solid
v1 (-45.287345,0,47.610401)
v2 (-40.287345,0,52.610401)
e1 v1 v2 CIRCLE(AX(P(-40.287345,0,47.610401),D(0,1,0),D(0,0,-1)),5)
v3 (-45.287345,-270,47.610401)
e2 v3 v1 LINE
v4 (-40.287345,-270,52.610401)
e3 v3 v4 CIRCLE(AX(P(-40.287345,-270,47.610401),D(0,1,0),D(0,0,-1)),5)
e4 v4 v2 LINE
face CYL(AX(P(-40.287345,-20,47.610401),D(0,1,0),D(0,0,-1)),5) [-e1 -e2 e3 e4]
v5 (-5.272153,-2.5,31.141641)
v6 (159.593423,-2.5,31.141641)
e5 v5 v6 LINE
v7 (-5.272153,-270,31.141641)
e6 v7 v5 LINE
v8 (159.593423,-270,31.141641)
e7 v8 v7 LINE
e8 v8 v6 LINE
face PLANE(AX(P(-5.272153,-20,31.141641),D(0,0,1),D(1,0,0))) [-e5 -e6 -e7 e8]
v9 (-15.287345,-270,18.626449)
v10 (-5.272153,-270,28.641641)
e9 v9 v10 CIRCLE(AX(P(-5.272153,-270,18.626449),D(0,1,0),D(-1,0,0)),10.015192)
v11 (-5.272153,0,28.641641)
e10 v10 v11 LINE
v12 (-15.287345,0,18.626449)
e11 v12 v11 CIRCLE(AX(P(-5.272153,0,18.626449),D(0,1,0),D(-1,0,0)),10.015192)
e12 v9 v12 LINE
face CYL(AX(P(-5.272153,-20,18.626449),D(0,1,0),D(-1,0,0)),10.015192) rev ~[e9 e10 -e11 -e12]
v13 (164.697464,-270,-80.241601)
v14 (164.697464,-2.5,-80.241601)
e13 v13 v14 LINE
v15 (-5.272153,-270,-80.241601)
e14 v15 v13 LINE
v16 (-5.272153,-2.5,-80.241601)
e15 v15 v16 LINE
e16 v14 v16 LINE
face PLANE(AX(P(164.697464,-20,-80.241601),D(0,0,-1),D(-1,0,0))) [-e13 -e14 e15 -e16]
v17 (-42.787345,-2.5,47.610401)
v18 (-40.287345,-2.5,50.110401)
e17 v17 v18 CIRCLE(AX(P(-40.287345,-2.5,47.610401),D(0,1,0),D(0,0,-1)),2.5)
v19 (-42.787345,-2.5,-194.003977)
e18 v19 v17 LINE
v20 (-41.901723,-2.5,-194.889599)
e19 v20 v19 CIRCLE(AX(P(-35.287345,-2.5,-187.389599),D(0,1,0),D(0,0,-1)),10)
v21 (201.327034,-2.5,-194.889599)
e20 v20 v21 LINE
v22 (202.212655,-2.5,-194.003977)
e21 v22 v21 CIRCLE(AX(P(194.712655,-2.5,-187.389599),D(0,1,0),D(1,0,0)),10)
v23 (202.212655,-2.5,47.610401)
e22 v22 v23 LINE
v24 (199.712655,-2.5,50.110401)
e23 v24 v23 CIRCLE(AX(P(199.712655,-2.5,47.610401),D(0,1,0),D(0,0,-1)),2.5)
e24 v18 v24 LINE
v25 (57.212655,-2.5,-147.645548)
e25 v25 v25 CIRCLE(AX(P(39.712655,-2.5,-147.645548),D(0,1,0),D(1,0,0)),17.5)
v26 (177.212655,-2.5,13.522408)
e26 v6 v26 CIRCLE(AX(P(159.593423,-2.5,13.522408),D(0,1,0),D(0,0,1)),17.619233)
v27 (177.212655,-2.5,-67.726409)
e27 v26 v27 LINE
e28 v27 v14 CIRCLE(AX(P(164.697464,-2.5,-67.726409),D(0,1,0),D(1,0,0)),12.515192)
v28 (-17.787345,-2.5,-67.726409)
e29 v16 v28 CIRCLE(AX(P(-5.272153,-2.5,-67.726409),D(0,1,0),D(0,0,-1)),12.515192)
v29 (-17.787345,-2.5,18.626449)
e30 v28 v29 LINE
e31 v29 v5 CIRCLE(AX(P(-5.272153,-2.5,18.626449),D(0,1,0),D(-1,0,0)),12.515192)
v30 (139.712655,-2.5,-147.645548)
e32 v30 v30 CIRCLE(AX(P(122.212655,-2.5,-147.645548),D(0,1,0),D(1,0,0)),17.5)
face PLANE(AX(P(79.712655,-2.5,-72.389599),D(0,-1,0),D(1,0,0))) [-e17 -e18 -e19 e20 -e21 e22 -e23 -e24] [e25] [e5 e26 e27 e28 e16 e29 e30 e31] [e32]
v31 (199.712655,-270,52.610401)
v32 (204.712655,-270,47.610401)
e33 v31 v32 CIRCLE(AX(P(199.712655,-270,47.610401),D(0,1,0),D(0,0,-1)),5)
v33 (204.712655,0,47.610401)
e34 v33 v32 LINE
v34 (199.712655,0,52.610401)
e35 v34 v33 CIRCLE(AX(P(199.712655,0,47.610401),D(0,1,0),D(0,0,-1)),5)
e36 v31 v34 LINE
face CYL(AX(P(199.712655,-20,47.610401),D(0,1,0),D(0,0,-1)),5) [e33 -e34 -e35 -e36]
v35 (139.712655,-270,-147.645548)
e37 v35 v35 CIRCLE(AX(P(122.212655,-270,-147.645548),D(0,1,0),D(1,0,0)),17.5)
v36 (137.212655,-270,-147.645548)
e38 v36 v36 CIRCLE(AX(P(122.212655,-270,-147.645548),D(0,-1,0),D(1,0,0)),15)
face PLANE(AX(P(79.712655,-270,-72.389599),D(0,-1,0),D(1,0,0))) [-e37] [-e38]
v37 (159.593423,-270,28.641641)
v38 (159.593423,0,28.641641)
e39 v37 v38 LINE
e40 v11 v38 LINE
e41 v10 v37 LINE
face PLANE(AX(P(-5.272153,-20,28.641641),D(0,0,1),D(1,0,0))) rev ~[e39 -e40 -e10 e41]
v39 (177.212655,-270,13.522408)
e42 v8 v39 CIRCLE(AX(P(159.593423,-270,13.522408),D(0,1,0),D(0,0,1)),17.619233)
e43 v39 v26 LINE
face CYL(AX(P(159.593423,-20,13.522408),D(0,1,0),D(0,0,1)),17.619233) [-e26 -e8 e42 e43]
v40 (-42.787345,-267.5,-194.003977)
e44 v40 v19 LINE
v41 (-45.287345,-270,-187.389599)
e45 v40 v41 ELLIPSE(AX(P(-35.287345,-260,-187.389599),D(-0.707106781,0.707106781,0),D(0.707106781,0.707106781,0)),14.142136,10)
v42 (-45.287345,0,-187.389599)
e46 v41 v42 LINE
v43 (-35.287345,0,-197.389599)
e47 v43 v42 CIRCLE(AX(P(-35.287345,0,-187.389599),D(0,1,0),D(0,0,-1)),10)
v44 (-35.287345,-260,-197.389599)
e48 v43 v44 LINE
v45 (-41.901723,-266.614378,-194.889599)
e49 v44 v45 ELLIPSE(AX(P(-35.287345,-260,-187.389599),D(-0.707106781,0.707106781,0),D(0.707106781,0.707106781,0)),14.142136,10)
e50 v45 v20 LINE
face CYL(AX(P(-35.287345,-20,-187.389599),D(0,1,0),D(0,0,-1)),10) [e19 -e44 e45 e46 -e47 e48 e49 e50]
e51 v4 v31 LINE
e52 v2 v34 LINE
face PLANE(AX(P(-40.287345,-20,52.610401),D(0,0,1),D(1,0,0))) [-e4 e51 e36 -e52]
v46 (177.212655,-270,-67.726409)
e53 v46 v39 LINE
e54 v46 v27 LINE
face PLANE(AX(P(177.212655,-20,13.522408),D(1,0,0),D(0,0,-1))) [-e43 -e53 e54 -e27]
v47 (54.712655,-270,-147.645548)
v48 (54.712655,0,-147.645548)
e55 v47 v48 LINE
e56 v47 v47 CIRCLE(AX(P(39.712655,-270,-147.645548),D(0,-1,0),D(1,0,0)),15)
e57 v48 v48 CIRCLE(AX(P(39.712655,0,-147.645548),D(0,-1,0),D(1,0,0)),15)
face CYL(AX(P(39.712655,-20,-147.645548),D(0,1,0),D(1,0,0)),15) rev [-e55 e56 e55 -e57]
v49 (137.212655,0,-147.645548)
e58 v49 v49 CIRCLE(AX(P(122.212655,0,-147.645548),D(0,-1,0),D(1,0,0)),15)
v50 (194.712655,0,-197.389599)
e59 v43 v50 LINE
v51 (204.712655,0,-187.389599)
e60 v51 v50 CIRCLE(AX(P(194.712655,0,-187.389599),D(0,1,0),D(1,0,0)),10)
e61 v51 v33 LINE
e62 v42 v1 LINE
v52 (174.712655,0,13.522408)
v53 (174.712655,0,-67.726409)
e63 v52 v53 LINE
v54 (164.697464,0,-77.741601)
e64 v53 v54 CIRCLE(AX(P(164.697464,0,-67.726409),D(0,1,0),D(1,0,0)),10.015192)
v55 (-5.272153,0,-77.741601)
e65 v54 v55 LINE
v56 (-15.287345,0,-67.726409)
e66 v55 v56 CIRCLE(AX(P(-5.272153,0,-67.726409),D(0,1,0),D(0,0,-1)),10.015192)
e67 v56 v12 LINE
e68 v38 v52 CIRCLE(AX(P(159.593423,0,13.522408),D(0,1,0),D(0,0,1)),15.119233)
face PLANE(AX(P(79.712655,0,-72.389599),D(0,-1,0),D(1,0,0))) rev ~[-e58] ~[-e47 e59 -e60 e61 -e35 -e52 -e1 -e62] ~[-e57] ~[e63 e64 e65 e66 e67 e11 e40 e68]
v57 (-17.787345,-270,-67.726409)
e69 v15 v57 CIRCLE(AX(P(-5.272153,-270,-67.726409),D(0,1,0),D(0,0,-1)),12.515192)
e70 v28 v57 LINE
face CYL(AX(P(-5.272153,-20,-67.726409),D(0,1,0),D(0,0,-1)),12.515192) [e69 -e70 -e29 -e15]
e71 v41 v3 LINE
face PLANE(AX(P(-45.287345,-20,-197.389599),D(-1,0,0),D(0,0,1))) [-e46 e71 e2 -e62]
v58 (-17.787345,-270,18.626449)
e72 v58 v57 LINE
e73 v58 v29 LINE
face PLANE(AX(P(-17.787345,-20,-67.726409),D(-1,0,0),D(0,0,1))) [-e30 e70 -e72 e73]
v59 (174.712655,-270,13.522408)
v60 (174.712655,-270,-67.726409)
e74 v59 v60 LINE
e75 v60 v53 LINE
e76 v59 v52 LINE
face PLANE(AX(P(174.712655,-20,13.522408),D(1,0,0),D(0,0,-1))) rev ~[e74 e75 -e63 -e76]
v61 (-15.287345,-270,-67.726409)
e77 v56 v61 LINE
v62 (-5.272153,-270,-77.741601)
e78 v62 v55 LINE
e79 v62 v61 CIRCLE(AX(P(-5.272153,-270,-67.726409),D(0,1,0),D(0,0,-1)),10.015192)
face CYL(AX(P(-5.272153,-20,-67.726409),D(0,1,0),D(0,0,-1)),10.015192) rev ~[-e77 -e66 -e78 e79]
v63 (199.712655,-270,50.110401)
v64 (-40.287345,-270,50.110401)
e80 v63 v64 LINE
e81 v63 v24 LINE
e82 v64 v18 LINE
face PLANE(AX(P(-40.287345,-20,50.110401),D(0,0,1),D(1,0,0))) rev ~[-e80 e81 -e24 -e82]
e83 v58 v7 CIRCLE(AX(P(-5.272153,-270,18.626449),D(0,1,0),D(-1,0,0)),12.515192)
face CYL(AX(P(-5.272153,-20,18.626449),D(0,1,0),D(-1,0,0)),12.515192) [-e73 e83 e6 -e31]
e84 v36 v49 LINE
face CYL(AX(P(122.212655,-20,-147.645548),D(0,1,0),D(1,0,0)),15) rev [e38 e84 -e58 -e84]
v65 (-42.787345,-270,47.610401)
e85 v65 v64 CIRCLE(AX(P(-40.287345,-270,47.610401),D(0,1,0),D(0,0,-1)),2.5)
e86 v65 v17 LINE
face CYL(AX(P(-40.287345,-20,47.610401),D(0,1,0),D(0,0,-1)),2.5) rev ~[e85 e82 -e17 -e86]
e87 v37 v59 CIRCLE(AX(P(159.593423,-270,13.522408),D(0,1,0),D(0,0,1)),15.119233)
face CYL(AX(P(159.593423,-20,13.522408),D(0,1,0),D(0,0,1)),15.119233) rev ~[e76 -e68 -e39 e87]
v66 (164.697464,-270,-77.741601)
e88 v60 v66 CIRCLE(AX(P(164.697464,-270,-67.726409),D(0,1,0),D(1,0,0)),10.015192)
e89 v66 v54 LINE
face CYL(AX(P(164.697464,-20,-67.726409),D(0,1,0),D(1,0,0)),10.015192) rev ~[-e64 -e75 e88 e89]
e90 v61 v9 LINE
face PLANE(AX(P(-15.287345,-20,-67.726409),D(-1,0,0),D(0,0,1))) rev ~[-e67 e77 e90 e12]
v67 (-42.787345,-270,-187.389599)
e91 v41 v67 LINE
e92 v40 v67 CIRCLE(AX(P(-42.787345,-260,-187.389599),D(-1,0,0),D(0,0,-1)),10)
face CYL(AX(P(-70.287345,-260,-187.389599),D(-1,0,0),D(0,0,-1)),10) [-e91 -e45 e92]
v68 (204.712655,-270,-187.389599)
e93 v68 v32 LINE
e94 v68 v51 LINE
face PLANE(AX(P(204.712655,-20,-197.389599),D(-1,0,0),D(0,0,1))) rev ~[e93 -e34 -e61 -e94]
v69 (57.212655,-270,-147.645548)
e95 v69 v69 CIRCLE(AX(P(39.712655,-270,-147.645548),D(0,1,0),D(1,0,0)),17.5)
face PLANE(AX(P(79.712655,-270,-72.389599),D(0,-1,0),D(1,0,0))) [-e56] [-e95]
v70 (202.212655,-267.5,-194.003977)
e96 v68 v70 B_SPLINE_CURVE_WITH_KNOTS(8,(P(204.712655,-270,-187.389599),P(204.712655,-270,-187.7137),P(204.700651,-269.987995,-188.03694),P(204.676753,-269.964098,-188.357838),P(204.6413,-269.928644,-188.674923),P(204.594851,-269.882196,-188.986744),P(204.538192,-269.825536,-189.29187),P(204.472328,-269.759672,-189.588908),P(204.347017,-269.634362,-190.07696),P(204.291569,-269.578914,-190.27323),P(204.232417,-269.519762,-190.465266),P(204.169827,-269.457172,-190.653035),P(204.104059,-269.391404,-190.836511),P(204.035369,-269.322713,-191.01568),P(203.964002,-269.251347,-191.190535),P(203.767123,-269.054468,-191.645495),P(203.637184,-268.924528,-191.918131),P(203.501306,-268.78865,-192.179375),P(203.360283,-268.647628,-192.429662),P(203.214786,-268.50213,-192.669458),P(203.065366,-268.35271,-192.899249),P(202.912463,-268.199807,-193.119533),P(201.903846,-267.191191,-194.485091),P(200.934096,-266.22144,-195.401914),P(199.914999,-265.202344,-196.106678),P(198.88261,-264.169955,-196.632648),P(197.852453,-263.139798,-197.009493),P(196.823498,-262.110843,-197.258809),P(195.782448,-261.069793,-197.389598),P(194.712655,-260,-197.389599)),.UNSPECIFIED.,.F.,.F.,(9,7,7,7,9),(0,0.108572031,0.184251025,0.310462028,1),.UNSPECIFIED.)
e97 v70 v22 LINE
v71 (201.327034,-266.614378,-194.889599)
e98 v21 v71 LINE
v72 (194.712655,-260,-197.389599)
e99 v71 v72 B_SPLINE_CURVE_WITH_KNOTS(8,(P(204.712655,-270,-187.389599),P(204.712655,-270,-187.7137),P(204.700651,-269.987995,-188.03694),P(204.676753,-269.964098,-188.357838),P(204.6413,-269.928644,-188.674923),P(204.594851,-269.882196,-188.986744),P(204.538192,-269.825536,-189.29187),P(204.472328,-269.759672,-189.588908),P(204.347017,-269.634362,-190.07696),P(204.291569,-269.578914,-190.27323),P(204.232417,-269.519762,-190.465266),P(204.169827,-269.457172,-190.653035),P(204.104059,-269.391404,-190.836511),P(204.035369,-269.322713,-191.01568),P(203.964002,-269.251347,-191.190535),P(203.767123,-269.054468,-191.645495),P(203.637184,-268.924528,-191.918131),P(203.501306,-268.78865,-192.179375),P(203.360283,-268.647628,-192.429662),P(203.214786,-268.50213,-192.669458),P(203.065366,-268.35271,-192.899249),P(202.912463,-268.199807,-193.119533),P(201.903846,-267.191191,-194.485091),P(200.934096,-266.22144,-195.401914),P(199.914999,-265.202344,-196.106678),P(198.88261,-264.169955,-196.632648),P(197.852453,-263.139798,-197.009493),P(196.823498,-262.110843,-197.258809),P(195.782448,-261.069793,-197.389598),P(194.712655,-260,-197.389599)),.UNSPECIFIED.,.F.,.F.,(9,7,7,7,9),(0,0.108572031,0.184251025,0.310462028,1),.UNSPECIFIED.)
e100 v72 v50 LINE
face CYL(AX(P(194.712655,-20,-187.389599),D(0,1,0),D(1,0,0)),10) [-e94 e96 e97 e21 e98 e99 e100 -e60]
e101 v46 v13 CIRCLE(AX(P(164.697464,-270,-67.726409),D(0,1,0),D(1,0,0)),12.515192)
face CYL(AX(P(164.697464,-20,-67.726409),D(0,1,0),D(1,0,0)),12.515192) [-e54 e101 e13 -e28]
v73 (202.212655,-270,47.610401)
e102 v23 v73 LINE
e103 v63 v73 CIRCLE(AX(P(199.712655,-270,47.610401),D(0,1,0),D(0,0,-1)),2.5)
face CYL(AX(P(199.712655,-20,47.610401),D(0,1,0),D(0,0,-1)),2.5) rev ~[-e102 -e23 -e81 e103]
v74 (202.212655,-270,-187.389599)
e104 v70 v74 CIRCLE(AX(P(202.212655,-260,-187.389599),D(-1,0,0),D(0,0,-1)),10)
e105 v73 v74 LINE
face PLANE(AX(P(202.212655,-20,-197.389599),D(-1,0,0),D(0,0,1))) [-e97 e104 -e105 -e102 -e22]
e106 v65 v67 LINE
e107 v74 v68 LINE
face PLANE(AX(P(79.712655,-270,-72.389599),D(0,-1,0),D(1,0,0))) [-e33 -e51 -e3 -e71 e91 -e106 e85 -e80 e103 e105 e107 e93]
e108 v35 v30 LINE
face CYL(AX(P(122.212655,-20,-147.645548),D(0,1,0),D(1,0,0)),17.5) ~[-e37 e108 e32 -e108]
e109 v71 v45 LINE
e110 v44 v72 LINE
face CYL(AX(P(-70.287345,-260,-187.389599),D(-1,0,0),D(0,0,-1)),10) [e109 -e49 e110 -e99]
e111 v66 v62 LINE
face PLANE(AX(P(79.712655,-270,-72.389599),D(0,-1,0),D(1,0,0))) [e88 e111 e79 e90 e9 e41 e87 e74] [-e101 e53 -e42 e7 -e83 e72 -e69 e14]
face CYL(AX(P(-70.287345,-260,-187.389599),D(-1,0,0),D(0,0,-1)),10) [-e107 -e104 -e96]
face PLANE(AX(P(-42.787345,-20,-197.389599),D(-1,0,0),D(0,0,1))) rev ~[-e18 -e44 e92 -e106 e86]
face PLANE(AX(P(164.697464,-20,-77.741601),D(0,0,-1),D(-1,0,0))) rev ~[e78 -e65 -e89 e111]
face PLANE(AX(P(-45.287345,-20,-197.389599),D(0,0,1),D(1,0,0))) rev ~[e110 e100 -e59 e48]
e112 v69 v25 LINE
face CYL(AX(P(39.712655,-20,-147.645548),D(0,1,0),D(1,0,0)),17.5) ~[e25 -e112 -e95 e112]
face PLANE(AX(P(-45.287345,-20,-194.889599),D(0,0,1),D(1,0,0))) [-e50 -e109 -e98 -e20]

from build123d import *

# Parameters (mm, degrees)
F0_W        = 250
F0_H        = 250
F0_R        = 15
F1_DEPTH    = 20
F2_R        = 5
F3_DEPTH    = 250
F5_T        = -2.5
F6_T1_DEPTH = 45
F6_T3_DEPTH = 275
F6_T5_DEPTH = 300


# Not quite as in the source:
# - a fillet or chamfer that OpenCascade refuses, or shapes differently, is made with other operations: its cross-section is extruded or revolved along the edge and cut away or added
# - the program builds the solid bodies; features that only make, move or delete a surface that nothing else refers to are left out


with BuildPart() as f1:
    # F0 (on Front) → F1 (new body)
    with BuildSketch(Plane.XZ):
        with Locations((79.7126553953, -72.3895989358)):
            Rectangle(F0_W, F0_H)
        with Locations((39.7126553953, -147.645547986)):
            Circle(F0_R, mode=Mode.SUBTRACT)
        with Locations((122.2126553953, -147.645547986)):
            Circle(F0_R, mode=Mode.SUBTRACT)
        with BuildLine():
            Line((-15.2873446047, -67.7264088296), (-15.2873446047, 18.6264493965))
            ThreePointArc((-15.2873446047, 18.6264493965), (-12.3539628579, 25.7082593932), (-5.2721528612, 28.64164114))
            Line((-5.2721528612, 28.64164114), (159.5934226625, 28.64164114))
            ThreePointArc((159.5934226625, 28.64164114), (170.2843346542, 24.2133203989), (174.7126553953, 13.5224084073))
            Line((174.7126553953, 13.5224084073), (174.7126553953, -67.7264088296))
            ThreePointArc((174.7126553953, -67.7264088296), (171.7792736485, -74.8082188263), (164.6974636518, -77.7416005731))
            Line((164.6974636518, -77.7416005731), (-5.2721528612, -77.7416005731))
            ThreePointArc((-5.2721528612, -77.7416005731), (-12.3539628579, -74.8082188263), (-15.2873446047, -67.7264088296))
        make_face(mode=Mode.SUBTRACT)
    extrude(amount=F1_DEPTH)

    # F2
    f2_edges = [f1.edges().sort_by_distance(p)[0] for p in [
        (204.712655, -10, 52.610401),
        (-45.287345, -10, 52.610401),
    ]]
    fillet(f2_edges, radius=F2_R)

    # F3 (add): a face of the model
    f3_faces = [f1.faces().sort_by_distance(p)[0] for p in [
        (79.7304888538, -20, -93.2584337022),
    ]]
    extrude(f3_faces, amount=F3_DEPTH)

    # F5
    f5_openings = [f1.faces().sort_by_distance(p)[0] for p in [
        (79.730489, -270, -93.258434),
    ]]
    offset(amount=F5_T, openings=f5_openings, kind=Kind.INTERSECTION)

    # F6: fillet of radius 10 on 5 edges, made by hand

    # F6_s2 → F6_t1 (cut)
    with BuildSketch(Plane.XZ.offset(-25)):
        with BuildLine():
            ThreePointArc((204.7126553953, -187.3895989358), (201.7837232071, -194.4606667477), (194.7126553953, -197.3895989358))
            Line((194.7126553953, -197.3895989358), (204.7126553953, -197.3895989358))
            Line((204.7126553953, -197.3895989358), (204.7126553953, -187.3895989358))
        make_face()
        with BuildLine():
            ThreePointArc((-35.2873446047, -197.3895989358), (-42.3584124166, -194.4606667477), (-45.2873446047, -187.3895989358))
            Line((-45.2873446047, -187.3895989358), (-45.2873446047, -197.3895989358))
            Line((-45.2873446047, -197.3895989358), (-35.2873446047, -197.3895989358))
        make_face()
    extrude(amount=F6_T1_DEPTH, mode=Mode.SUBTRACT)

    # F6_s4 → F6_t3 (cut)
    with BuildSketch(Plane.XZ.offset(20)):
        with BuildLine():
            ThreePointArc((204.7126553953, -187.3895989358), (201.7837232071, -194.4606667477), (194.7126553953, -197.3895989358))
            Line((194.7126553953, -197.3895989358), (204.7126553953, -197.3895989358))
            Line((204.7126553953, -197.3895989358), (204.7126553953, -187.3895989358))
        make_face()
        with BuildLine():
            ThreePointArc((-35.2873446047, -197.3895989358), (-42.3584124166, -194.4606667477), (-45.2873446047, -187.3895989358))
            Line((-45.2873446047, -187.3895989358), (-45.2873446047, -197.3895989358))
            Line((-45.2873446047, -197.3895989358), (-35.2873446047, -197.3895989358))
        make_face()
    extrude(amount=F6_T3_DEPTH, mode=Mode.SUBTRACT)

    # F6_s6 → F6_t5 (cut)
    with BuildSketch(Plane.YZ.offset(-70.2873446047)):
        with BuildLine():
            ThreePointArc((-260, -197.3895989358), (-267.0710678119, -194.4606667477), (-270, -187.3895989358))
            Line((-270, -187.3895989358), (-270, -197.3895989358))
            Line((-270, -197.3895989358), (-260, -197.3895989358))
        make_face()
    extrude(amount=F6_T5_DEPTH, mode=Mode.SUBTRACT)


solid = f1.part
